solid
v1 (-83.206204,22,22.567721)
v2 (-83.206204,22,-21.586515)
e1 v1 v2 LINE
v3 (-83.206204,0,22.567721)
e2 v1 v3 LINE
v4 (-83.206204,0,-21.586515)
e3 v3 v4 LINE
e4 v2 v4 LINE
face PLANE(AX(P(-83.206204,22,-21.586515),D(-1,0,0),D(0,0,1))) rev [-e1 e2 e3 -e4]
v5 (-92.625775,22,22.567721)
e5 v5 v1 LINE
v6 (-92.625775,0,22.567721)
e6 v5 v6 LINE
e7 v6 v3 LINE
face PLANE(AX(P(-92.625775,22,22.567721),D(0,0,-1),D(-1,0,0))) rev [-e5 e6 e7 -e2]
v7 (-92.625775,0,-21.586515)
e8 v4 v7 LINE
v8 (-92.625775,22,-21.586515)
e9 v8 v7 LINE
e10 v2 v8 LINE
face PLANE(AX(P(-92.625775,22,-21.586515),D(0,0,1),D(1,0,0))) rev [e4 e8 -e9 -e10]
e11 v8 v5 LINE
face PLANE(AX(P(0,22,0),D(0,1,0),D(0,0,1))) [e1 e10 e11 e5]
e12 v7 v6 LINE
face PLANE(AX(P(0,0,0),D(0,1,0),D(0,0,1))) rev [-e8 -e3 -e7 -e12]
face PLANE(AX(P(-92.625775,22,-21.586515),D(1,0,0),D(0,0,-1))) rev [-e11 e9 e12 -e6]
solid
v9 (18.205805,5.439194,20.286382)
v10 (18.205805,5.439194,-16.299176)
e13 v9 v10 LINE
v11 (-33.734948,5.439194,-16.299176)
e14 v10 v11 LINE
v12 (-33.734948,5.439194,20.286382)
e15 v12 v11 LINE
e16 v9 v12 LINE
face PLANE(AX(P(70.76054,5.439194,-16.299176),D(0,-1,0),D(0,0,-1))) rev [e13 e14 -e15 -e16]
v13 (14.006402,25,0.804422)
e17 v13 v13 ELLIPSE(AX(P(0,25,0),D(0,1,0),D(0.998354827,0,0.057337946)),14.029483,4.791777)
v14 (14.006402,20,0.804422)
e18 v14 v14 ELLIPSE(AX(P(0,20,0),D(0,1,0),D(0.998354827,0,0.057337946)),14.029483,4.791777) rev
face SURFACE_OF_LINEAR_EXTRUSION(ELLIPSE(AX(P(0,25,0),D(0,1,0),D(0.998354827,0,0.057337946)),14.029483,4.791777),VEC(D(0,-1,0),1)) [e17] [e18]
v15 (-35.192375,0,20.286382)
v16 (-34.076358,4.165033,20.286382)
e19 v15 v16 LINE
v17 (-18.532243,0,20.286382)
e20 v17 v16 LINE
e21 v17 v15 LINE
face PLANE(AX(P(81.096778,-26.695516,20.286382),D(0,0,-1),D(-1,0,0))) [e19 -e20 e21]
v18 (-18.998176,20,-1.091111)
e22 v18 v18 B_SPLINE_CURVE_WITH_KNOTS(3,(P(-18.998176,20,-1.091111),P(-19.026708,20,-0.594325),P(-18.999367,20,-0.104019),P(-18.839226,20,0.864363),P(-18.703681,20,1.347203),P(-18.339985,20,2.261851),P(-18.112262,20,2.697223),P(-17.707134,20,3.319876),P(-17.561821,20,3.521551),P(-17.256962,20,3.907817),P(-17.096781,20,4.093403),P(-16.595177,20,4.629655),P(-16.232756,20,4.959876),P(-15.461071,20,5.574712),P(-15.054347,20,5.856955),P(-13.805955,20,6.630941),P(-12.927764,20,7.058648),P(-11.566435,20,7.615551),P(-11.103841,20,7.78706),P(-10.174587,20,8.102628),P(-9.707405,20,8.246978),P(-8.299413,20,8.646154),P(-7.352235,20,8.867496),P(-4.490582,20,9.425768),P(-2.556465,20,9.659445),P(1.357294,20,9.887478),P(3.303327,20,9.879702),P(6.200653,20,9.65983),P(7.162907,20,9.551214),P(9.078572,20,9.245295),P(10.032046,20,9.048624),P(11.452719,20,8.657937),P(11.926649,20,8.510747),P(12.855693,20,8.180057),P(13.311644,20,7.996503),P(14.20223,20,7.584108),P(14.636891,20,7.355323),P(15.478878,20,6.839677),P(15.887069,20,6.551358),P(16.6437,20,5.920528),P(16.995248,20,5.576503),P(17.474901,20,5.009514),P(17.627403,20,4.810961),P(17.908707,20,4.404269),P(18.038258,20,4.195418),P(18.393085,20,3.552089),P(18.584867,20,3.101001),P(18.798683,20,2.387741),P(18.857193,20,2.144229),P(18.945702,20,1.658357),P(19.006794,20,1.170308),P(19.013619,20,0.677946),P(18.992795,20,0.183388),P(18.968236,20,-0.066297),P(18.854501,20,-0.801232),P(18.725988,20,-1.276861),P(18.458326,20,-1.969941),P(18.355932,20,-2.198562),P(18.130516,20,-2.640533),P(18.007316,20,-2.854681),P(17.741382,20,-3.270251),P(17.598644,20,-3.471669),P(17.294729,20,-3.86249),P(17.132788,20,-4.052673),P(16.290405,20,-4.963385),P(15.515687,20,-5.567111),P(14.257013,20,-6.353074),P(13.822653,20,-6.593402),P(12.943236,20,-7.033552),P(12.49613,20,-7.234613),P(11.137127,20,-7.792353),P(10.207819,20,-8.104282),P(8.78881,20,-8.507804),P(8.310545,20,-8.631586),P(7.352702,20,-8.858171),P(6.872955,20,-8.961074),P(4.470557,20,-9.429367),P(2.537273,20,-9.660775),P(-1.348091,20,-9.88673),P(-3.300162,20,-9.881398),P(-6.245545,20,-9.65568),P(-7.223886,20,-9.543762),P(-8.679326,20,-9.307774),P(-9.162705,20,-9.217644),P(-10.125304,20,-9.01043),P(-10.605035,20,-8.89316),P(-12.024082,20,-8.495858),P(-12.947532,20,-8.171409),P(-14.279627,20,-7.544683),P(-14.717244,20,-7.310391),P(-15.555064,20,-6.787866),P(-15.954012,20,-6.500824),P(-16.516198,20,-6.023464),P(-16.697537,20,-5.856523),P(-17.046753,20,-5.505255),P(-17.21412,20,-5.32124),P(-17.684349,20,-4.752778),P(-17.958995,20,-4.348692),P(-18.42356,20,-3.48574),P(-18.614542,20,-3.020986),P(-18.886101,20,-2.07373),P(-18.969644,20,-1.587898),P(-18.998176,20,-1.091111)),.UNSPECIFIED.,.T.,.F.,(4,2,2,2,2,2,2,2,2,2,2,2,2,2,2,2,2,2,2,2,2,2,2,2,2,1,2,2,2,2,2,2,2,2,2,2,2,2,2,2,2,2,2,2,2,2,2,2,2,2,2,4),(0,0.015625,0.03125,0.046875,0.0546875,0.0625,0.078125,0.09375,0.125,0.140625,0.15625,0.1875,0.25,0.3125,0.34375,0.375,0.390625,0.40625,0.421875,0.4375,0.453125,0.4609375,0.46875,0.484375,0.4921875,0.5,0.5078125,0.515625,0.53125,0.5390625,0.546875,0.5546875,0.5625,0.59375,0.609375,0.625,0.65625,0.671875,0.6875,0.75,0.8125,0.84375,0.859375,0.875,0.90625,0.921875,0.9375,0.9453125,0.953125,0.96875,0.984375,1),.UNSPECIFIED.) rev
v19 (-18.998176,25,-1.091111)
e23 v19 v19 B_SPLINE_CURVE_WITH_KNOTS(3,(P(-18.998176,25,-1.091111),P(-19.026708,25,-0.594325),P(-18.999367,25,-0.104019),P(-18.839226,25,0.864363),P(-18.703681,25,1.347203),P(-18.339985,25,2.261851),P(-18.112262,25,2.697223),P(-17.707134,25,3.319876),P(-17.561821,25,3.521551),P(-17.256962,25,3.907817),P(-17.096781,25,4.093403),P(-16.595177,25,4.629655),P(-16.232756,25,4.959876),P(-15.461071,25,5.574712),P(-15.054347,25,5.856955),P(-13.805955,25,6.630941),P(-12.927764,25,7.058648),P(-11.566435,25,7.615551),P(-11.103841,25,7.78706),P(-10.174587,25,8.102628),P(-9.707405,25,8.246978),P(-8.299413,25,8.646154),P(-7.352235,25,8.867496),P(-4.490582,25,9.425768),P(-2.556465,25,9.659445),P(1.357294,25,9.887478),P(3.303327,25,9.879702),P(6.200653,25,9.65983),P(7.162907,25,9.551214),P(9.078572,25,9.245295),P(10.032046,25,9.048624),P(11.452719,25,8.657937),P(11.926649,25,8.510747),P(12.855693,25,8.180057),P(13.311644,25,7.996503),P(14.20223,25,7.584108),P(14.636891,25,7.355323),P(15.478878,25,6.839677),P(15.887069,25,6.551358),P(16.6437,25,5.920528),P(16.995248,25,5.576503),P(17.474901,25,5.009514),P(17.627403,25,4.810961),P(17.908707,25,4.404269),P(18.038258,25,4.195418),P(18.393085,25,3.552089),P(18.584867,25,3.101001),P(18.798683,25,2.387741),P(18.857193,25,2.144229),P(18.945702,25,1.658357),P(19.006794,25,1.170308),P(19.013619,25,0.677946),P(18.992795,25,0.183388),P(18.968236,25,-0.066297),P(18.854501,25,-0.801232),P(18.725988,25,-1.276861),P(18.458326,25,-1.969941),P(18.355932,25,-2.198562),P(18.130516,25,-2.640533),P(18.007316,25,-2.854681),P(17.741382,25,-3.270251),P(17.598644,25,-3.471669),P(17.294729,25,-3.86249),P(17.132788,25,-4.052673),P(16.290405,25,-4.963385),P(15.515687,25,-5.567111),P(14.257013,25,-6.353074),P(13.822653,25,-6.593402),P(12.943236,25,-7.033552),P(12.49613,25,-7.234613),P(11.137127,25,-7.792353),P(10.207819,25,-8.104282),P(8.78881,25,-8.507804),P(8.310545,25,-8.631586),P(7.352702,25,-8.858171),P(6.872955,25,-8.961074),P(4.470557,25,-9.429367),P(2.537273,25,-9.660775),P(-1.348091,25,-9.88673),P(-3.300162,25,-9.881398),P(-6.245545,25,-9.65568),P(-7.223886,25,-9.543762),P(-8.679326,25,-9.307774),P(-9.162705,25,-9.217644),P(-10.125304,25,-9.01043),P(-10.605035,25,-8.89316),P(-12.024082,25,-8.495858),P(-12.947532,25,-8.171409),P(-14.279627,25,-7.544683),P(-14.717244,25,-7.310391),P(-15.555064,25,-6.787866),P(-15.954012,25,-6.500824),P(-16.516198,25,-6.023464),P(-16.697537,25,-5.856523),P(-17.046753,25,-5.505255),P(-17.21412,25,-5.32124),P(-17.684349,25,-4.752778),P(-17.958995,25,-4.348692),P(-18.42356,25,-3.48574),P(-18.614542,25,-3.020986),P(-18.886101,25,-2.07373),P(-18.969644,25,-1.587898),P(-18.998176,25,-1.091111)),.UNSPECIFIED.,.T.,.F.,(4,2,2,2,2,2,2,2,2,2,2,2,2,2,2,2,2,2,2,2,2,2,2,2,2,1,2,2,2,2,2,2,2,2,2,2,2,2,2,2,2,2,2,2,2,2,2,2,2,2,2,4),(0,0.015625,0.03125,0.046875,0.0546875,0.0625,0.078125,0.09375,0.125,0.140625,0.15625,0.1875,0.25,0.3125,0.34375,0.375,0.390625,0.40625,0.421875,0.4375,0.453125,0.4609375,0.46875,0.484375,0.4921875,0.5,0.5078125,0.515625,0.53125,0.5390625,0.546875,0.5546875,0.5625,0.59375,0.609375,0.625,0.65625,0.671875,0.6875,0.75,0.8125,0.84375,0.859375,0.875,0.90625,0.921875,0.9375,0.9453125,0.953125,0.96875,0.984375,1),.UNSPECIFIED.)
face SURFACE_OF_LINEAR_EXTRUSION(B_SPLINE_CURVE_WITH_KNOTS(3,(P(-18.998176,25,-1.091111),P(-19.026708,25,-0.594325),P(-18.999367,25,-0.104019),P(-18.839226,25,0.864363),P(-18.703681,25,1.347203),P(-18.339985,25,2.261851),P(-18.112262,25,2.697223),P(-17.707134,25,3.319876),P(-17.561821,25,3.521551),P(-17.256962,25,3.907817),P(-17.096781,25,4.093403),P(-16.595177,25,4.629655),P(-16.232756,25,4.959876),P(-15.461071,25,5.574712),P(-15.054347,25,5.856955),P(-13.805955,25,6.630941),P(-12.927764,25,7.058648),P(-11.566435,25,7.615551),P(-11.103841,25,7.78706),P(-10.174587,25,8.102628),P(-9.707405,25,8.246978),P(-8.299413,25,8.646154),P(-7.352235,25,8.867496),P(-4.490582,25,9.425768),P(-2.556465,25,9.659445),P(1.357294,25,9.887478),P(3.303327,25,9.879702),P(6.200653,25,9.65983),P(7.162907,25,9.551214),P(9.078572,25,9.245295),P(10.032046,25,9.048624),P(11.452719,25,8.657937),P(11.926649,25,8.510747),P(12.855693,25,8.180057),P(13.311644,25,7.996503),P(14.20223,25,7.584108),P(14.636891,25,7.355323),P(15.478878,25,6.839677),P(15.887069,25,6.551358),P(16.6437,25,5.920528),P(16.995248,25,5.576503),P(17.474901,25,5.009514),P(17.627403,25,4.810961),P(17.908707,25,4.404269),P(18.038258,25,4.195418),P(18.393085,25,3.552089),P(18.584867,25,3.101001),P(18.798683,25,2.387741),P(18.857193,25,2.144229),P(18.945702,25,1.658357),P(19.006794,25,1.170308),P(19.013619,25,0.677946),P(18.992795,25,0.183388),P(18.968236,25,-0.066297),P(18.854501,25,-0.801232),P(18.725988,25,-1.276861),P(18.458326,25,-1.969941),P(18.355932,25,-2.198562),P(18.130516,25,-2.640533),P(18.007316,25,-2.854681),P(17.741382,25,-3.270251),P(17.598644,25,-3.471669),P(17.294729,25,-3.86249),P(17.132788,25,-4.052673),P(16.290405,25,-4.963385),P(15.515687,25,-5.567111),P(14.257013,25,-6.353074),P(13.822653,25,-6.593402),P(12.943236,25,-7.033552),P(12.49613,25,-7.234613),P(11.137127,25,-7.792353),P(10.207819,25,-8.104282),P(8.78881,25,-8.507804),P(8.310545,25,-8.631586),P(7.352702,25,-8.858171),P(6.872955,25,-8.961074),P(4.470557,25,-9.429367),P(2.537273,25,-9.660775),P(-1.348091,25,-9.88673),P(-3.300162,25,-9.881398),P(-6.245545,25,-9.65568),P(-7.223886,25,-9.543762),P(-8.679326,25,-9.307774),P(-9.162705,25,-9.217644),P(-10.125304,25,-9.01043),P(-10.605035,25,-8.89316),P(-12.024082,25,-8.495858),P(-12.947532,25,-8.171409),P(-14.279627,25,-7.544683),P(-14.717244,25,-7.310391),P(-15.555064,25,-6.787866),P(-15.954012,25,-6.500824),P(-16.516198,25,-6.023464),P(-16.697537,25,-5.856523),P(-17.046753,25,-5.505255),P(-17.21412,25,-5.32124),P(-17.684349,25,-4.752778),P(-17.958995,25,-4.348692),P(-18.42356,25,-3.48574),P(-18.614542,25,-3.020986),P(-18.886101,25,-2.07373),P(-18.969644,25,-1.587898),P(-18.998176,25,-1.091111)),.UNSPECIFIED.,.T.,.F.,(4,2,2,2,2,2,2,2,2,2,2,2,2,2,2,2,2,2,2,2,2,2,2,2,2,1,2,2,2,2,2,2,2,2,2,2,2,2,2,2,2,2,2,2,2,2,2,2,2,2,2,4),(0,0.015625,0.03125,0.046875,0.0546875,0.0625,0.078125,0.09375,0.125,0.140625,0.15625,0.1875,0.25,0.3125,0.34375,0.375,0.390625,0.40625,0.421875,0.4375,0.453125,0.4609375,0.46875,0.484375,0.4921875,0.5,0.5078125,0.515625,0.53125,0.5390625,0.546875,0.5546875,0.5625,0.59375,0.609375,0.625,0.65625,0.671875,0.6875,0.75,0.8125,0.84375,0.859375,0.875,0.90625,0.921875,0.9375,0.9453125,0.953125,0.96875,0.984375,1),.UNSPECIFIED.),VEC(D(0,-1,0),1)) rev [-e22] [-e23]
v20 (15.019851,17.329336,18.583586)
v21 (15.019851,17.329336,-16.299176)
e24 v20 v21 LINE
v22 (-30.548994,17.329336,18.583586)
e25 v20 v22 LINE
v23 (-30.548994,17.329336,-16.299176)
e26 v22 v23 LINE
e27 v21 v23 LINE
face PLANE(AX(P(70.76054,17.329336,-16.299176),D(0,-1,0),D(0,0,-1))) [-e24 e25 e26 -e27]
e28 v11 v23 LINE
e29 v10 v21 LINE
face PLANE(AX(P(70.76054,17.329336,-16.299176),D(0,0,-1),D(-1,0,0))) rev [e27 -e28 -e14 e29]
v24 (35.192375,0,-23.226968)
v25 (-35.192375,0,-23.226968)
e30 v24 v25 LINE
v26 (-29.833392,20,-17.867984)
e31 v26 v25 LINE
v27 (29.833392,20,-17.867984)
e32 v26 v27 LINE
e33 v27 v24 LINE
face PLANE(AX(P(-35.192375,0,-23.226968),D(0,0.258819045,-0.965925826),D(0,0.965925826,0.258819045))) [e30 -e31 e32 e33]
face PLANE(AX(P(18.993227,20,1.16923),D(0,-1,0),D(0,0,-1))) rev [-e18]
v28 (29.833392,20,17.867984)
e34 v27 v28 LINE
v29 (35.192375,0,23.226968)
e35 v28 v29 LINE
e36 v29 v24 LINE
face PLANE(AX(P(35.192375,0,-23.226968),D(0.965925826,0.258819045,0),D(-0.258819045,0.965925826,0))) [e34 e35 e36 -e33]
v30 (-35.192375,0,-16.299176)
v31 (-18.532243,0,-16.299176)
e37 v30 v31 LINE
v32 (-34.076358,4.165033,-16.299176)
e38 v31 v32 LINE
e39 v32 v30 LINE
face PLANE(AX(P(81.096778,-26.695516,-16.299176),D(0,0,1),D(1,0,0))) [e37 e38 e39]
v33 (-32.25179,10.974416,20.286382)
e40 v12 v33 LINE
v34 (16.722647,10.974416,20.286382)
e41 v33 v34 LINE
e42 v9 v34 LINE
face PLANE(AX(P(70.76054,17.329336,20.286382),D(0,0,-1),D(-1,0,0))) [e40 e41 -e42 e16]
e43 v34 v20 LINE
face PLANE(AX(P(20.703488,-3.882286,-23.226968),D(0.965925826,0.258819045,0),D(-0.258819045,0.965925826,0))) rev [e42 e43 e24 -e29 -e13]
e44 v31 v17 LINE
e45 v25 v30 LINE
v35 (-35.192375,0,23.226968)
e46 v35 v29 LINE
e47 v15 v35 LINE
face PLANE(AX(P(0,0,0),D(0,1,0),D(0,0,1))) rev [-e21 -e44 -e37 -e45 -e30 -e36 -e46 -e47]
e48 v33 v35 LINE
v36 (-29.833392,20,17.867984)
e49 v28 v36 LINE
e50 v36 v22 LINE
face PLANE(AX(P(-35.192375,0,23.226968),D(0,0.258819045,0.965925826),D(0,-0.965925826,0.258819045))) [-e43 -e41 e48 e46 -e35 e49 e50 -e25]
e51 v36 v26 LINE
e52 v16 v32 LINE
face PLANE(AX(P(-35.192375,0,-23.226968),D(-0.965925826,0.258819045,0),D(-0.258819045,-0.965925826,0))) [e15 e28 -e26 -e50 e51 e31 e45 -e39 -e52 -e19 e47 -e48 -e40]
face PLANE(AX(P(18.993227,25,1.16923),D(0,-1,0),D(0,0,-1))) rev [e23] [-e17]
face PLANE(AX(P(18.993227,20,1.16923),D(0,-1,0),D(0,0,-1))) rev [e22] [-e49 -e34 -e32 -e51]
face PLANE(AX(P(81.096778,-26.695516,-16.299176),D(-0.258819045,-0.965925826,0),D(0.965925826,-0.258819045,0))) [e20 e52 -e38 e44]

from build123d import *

# Parameters (mm, degrees)
EXTRUDE_THIN2_DEPTH = 10
SKETCH1_W           = 70.384750894
SKETCH1_H           = 46.45393559
BOSS_EXTRUDE1_DEPTH = 20
BOSS_EXTRUDE1_TAPER = 15
SKETCH3_W           = 9.419570306
SKETCH3_H           = 44.154235808
BOSS_EXTRUDE2_DEPTH = 22
SKETCH6_W           = 36.585558134
SKETCH6_H           = 11.890141367
CUT_EXTRUDE3_DEPTH  = 131.353188747
CUT_EXTRUDE5_REACH  = 125.218
SKETCH6_2_W         = 36.585558134
SKETCH6_2_H         = 11.890141367


# Read off the part's stored shape, not the designer's step: Extrude-Thin2
with BuildPart() as part:
    # Extrude-Thin2 outline → Extrude-Thin2 (new body)
    with BuildSketch(Plane(origin=(0, 15, 0), x_dir=(1, 0, 0), z_dir=(0, 1, 0))):
        with BuildLine():
            add(Edge.make_bspline(
                [(-18.998176096, 1.091111465), (-19.026707732, 0.594325331), (-18.999367317, 0.104018854), (-18.83922552, -0.864363457), (-18.703680911, -1.347203381), (-18.3399848, -2.261851117), (-18.112261527, -2.697223431), (-17.707133567, -3.31987619), (-17.561821431, -3.521551229), (-17.256961844, -3.907816675), (-17.096781418, -4.093403121), (-16.595177089, -4.629654759), (-16.232755973, -4.959876356), (-15.461071442, -5.574712302), (-15.054347497, -5.85695505), (-13.805954836, -6.63094112), (-12.927764124, -7.058648253), (-11.566435483, -7.615551307), (-11.103841353, -7.787060437), (-10.174587257, -8.102627564), (-9.707404908, -8.246978438), (-8.299413393, -8.646153824), (-7.35223485, -8.86749584), (-4.490581722, -9.425768365), (-2.556465159, -9.659445057), (1.357293874, -9.887478163), (3.303327245, -9.879702174), (6.200653464, -9.65983033), (7.162906962, -9.55121436), (9.078571867, -9.245294735), (10.032046369, -9.048623919), (11.452718842, -8.65793707), (11.9266494, -8.510746971), (12.85569307, -8.180056561), (13.311644387, -7.996503088), (14.202230408, -7.584108491), (14.636891218, -7.35532283), (15.478877759, -6.83967748), (15.887069074, -6.551358026), (16.643700007, -5.920527822), (16.995248402, -5.576502963), (17.474900792, -5.009513782), (17.627403163, -4.810961371), (17.908706639, -4.404269033), (18.03825758, -4.19541772), (18.393085214, -3.552089081), (18.584867144, -3.101000921), (18.798682542, -2.387741026), (18.857193023, -2.144228508), (18.945701646, -1.658357403), (19.006794174, -1.170307901), (19.013618817, -0.677946444), (18.992794611, -0.183388095), (18.96823576, 0.066297242), (18.854500651, 0.801231602), (18.725987683, 1.27686101), (18.458326403, 1.969941266), (18.355931811, 2.198561706), (18.130515869, 2.640532605), (18.007315595, 2.854681318), (17.741382483, 3.270251415), (17.598643631, 3.47166888), (17.294728923, 3.862490343), (17.132787663, 4.052672698), (16.290405012, 4.963385446), (15.515687177, 5.567111077), (14.257012777, 6.353073628), (13.822653055, 6.593402096), (12.94323625, 7.033551812), (12.496129735, 7.234613427), (11.137127407, 7.792353287), (10.207819429, 8.104282044), (8.788810338, 8.507803751), (8.310544766, 8.631586187), (7.352701557, 8.858171042), (6.872955469, 8.961073581), (4.470557325, 9.429367072), (2.537273087, 9.660774665), (-1.348091277, 9.886730042), (-3.300161897, 9.881397642), (-6.245544824, 9.655679831), (-7.223886131, 9.543762437), (-8.679326473, 9.307773994), (-9.162704785, 9.217644142), (-10.125304394, 9.010429698), (-10.605034859, 8.893160068), (-12.02408202, 8.495857862), (-12.947532321, 8.171409054), (-14.279627464, 7.544682665), (-14.717244368, 7.31039063), (-15.555064148, 6.787865653), (-15.954012351, 6.500823944), (-16.516197897, 6.023463957), (-16.697537387, 5.856523429), (-17.046752813, 5.505255067), (-17.214119751, 5.321239539), (-17.684348837, 4.752778083), (-17.958995408, 4.348692272), (-18.423559979, 3.485739746), (-18.614542316, 3.020985977), (-18.886100797, 2.073730131), (-18.96964446, 1.587897599), (-18.998176096, 1.091111465)],
                knots=[0, 0, 0, 0, 0.015625, 0.015625, 0.03125, 0.03125, 0.046875, 0.046875, 0.0546875, 0.0546875, 0.0625, 0.0625, 0.078125, 0.078125, 0.09375, 0.09375, 0.125, 0.125, 0.140625, 0.140625, 0.15625, 0.15625, 0.1875, 0.1875, 0.25, 0.25, 0.3125, 0.3125, 0.34375, 0.34375, 0.375, 0.375, 0.390625, 0.390625, 0.40625, 0.40625, 0.421875, 0.421875, 0.4375, 0.4375, 0.453125, 0.453125, 0.4609375, 0.4609375, 0.46875, 0.46875, 0.484375, 0.484375, 0.4921875, 0.4921875, 0.5, 0.5078125, 0.5078125, 0.515625, 0.515625, 0.53125, 0.53125, 0.5390625, 0.5390625, 0.546875, 0.546875, 0.5546875, 0.5546875, 0.5625, 0.5625, 0.59375, 0.59375, 0.609375, 0.609375, 0.625, 0.625, 0.65625, 0.65625, 0.671875, 0.671875, 0.6875, 0.6875, 0.75, 0.75, 0.8125, 0.8125, 0.84375, 0.84375, 0.859375, 0.859375, 0.875, 0.875, 0.90625, 0.90625, 0.921875, 0.921875, 0.9375, 0.9375, 0.9453125, 0.9453125, 0.953125, 0.953125, 0.96875, 0.96875, 0.984375, 0.984375, 1, 1, 1, 1], degree=3))
        make_face()
        with BuildLine():
            add(Edge.make_bspline(
                [(14.006401962, -0.804421734), (14.482284092, 7.481525938), (-6.765259916, 4.545184703), (-28.012803925, 1.608843469), (-7.241142046, -3.740762969), (13.530519833, -9.090369406), (14.006401962, -0.804421734)],
                knots=[0, 0, 0, 2.094395102, 2.094395102, 4.188790205, 4.188790205, 6.283185307, 6.283185307, 6.283185307], degree=2, weights=[1, 0.5, 1, 0.5, 1, 0.5, 1]))
        make_face(mode=Mode.SUBTRACT)
    extrude(amount=EXTRUDE_THIN2_DEPTH)

    # Sketch1 → Boss-Extrude1 (add)
    with BuildSketch(Plane(origin=(0, 0, 0), x_dir=(1, 0, 0), z_dir=(0, 1, 0))):
        Rectangle(SKETCH1_W, SKETCH1_H)
    extrude(amount=BOSS_EXTRUDE1_DEPTH, taper=BOSS_EXTRUDE1_TAPER)

    # Sketch6 → Cut-Extrude3 (cut, along a direction that is not the sketch's normal)
    with BuildSketch(Plane(origin=(-83.206204367, 0, 0), x_dir=(0, 0, -1), z_dir=(1, 0, 0))):
        with Locations((-1.99360281, 11.38426496)):
            Rectangle(SKETCH6_W, SKETCH6_H)
    extrude(amount=CUT_EXTRUDE3_DEPTH, dir=(0.9659258262890681, -0.25881904510252135, 0), mode=Mode.SUBTRACT)

    # Cut-Extrude5: up to this plane
    cut_extrude5_end = Plane(origin=(20.703488052, -3.882285677, -23.226967795), z_dir=(0.9659258262890681, 0.25881904510252135, 0))
    # Sketch6<2> → Cut-Extrude5 (cut, up to the surface)
    with BuildSketch(Plane(origin=(-83.206204367, 0, 0), x_dir=(0, 0, -1), z_dir=(1, 0, 0)), mode=Mode.PRIVATE) as cut_extrude5_sk1:
        with Locations((-1.99360281, 11.38426496)):
            Rectangle(SKETCH6_2_W, SKETCH6_2_H)
    cut_extrude5_tool1 = split(extrude(cut_extrude5_sk1.sketch, amount=CUT_EXTRUDE5_REACH, mode=Mode.PRIVATE), bisect_by=cut_extrude5_end, keep=Keep.BOTH, mode=Mode.PRIVATE)
    add(cut_extrude5_tool1.solids().sort_by_distance((-83.206204, 11.384265, 1.993603))[0], mode=Mode.SUBTRACT)


with BuildPart() as body_2:
    # Sketch3 → Boss-Extrude2 (new body)
    with BuildSketch(Plane(origin=(0, 0, 0), x_dir=(1, 0, 0), z_dir=(0, 1, 0))):
        with Locations((-87.91598952, -0.49060262)):
            Rectangle(SKETCH3_W, SKETCH3_H)
    extrude(amount=BOSS_EXTRUDE2_DEPTH)


solid = Compound([part.part, body_2.part])
